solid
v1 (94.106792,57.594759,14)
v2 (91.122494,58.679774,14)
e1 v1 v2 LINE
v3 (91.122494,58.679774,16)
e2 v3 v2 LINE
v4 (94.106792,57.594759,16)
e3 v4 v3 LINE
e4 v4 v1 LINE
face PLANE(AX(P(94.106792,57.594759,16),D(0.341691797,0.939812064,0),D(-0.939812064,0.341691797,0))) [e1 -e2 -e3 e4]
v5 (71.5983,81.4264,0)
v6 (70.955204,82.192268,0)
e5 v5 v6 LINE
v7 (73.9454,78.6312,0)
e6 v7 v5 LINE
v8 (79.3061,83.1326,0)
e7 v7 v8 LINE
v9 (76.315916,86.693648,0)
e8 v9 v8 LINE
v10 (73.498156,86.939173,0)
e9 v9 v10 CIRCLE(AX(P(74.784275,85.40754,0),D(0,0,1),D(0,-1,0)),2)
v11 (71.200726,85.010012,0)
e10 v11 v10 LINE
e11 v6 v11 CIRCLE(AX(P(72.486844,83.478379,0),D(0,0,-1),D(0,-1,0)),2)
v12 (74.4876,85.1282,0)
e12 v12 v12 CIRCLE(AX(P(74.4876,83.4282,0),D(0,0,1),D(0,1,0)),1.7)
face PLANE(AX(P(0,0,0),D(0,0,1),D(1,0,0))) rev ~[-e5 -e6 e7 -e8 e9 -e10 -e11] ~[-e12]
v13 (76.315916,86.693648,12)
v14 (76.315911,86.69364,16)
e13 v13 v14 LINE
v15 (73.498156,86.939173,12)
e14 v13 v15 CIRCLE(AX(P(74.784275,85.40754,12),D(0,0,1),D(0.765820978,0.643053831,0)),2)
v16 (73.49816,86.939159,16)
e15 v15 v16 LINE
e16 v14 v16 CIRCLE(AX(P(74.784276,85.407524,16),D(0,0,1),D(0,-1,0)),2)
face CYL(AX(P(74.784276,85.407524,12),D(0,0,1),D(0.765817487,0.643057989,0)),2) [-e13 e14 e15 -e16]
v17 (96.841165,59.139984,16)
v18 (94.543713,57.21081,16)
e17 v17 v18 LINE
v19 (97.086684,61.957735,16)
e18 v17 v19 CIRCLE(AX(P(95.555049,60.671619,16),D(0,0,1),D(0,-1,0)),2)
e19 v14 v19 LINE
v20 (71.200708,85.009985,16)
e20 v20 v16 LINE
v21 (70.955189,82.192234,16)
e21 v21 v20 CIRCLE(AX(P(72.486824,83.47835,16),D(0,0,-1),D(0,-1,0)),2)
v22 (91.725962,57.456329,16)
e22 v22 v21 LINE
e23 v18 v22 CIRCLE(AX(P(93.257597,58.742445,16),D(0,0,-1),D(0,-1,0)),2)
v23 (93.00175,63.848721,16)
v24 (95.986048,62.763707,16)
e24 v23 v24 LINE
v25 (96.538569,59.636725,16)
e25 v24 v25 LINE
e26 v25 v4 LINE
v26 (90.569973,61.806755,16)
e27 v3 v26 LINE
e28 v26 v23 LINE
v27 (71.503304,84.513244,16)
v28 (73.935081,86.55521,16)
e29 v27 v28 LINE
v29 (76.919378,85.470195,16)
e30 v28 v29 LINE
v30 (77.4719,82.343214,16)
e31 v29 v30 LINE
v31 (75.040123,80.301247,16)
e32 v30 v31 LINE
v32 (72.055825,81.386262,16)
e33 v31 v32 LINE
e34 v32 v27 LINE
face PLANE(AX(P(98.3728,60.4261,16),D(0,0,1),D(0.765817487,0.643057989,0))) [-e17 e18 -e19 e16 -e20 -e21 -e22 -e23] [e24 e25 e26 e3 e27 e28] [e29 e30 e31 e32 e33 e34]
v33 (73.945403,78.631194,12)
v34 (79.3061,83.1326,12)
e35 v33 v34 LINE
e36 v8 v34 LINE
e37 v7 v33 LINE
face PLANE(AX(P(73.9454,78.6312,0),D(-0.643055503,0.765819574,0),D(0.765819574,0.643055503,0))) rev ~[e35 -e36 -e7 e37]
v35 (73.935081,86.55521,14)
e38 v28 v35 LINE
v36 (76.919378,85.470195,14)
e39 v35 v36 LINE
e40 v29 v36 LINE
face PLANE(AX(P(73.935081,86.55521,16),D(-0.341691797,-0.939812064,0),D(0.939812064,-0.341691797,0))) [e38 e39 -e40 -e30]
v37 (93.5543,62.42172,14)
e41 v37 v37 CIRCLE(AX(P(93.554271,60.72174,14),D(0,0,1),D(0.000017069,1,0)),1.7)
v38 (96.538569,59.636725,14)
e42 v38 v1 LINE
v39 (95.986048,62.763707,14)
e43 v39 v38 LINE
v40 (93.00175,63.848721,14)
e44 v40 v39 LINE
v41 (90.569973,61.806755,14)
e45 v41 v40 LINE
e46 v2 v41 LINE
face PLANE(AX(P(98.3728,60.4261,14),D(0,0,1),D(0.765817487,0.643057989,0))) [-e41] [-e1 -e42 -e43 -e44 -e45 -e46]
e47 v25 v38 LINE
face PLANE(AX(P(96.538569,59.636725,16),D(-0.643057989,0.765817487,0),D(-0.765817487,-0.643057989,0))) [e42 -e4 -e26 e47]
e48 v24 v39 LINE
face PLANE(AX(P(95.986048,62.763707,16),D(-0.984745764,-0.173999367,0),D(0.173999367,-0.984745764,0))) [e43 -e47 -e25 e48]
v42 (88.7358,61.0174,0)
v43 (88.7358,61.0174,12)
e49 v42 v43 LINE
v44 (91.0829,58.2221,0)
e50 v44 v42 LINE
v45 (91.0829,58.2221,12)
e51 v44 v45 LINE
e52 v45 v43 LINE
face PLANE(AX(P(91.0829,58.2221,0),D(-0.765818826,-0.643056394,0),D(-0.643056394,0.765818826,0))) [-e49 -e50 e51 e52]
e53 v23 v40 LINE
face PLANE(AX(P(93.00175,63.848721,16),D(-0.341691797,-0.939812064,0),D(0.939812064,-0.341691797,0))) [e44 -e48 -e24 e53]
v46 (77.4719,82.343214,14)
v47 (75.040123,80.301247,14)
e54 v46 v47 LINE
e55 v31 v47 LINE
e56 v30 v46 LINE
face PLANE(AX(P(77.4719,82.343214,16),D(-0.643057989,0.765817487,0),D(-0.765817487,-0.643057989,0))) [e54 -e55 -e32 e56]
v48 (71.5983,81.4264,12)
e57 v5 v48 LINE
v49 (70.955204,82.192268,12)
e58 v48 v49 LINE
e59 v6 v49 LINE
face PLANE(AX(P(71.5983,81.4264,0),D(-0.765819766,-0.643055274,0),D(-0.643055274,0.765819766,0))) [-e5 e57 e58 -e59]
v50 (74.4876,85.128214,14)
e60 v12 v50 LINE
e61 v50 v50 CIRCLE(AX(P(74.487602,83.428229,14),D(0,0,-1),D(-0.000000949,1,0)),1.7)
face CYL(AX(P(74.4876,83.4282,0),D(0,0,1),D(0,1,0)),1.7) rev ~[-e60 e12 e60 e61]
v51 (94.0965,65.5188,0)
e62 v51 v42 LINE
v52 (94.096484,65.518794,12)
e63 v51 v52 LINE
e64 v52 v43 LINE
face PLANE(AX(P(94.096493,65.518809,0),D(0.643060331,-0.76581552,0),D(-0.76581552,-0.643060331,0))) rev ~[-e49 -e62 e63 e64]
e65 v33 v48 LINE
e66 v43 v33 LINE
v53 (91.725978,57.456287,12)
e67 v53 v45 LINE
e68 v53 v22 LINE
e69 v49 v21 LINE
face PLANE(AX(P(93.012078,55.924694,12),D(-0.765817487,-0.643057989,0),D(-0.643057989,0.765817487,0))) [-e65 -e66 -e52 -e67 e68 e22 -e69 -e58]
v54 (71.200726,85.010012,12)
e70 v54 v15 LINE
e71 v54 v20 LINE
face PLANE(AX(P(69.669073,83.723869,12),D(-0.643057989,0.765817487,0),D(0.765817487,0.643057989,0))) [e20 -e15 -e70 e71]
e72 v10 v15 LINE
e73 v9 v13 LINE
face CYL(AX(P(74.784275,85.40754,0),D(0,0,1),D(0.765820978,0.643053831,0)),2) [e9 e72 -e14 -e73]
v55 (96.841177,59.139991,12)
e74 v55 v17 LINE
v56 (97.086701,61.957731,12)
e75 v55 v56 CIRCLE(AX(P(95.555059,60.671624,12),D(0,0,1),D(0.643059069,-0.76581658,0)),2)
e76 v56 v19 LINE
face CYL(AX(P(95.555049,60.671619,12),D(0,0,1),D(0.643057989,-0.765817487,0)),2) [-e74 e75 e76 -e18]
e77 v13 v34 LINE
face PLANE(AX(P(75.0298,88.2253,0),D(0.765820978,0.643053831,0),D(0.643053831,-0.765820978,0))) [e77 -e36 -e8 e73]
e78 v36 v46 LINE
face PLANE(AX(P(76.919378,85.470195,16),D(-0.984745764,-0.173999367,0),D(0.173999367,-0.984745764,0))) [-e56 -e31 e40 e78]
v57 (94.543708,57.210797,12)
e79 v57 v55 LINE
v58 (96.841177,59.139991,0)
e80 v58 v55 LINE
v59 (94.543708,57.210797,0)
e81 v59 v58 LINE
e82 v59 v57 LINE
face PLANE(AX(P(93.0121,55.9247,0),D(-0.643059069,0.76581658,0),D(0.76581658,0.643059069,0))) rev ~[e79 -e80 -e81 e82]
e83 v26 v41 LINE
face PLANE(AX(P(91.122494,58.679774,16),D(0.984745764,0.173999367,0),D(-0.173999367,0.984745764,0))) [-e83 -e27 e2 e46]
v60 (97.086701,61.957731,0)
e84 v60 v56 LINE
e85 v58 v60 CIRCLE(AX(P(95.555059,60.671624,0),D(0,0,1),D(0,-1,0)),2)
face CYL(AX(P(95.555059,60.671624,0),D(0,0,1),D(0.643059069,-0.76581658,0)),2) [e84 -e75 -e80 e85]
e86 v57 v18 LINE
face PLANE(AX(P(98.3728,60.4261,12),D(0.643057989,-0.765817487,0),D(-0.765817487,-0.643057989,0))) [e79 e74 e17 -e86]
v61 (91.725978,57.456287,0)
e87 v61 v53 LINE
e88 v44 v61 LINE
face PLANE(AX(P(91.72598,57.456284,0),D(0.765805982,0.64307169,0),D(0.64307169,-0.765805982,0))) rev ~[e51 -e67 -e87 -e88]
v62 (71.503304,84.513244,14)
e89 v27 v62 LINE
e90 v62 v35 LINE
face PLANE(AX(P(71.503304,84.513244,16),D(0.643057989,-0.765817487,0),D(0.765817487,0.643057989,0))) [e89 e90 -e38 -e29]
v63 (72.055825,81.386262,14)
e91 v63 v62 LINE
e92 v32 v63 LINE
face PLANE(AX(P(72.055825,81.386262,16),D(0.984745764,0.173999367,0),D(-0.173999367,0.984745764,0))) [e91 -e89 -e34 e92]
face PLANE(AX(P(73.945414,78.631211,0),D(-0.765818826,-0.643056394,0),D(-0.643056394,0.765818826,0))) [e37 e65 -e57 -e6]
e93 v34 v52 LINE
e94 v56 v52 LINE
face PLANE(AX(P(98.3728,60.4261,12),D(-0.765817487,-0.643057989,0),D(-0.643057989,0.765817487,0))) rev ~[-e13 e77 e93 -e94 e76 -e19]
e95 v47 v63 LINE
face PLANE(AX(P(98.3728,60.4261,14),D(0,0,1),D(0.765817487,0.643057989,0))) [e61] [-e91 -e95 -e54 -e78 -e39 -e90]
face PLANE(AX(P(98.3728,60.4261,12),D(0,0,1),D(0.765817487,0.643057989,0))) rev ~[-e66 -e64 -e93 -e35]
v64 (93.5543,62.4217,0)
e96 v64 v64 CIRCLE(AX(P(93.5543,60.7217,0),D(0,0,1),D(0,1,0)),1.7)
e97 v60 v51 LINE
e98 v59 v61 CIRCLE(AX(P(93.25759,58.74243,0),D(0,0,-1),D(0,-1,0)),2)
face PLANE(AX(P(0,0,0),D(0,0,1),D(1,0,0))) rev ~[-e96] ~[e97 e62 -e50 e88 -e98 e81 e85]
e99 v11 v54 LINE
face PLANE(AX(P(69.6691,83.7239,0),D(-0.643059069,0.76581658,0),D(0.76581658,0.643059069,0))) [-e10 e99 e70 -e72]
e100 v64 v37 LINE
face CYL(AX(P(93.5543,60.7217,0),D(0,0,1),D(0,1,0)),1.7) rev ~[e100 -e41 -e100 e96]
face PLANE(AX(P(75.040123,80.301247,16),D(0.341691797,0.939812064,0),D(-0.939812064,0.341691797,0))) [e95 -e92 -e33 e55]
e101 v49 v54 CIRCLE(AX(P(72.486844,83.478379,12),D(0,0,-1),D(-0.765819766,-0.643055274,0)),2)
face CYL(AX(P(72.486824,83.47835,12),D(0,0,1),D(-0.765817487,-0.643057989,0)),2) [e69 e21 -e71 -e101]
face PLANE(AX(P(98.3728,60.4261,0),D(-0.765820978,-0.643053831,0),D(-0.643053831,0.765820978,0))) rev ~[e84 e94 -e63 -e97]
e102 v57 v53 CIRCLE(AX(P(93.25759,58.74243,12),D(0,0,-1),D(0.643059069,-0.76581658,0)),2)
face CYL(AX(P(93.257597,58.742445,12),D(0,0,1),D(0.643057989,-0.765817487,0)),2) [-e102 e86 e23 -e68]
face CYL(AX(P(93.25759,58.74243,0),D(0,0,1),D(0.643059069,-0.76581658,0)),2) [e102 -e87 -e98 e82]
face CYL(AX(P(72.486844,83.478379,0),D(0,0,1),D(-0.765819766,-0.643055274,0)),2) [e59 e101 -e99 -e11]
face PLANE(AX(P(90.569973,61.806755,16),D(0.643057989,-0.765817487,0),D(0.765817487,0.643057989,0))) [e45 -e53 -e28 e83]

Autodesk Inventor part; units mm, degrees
ref_plane "YZ Plane" through (0, 0, 0) normal (1, 0, 0) x (0, 1, 0)
sketch "Sketch1" plane through (0, 0, 0) normal (0, 0, 1) x (1, 0, 0)
  line L0 (91.0829, 58.2221) -> (71.5983, 81.4264) projected
  line L1 (73.9454, 78.6312) -> (81.7568, 85.1904) projected
  line L2 (96.5471, 67.5766) -> (88.7358, 61.0174) projected
  line L3 (71.5983, 81.4264) -> (69.6691, 83.7239)
  line L4 (69.6691, 83.7239) -> (75.0298, 88.2253)
  line L5 (75.0298, 88.2253) -> (79.3061, 83.1326)
  line L6 (91.0829, 58.2221) -> (93.0121, 55.9247)
  line L7 (93.0121, 55.9247) -> (98.3728, 60.4261)
  line L8 (98.3728, 60.4261) -> (94.0965, 65.5188)
  line L9 (81.3406, 69.8243) -> (102.4069, 87.5137) construction
  line L10 (91.726, 57.4563) -> (90.0029, 56.0094) projected
  line L11 (95.6925, 58.1754) -> (91.4161, 63.2681) construction
  line L12 (72.3494, 85.9746) -> (76.6258, 80.8819) construction
  point P0 (0, 0)
  point P1 (93.5543, 60.7217)
  point P2 (74.4876, 83.4282)
  dimension "d0" = 2
  dimension "d1" = 7
ref_plane "Work Plane1" through (72.2806, 68.9104, 57.5461) normal (0, 0, 1) x (0.7658175, 0.643058, 0)
ref_plane "Work Plane2" through (75.6298, 74.8001, 12) normal (0, 0, 1) x (0.7658175, 0.643058, 0)
extrude "Extrusion1" add sketch "Sketch1" along normal up to surface (12 mm away)
sketch "Sketch2" plane through (98.3728, 60.4261, 12) normal (0, 0, 1) x (0.7658175, 0.643058, 0)
  line L0 (0, 0) -> (0, 6.65) projected
  line L1 (-7, 29.65) -> (-7, 36.3) projected
  line L2 (0, 0) -> (-7, 0)
  line L3 (-7, 0) -> (-7, 36.3)
  line L4 (-7, 36.3) -> (0, 36.3)
  line L5 (0, 36.3) -> (0, 0)
  point P0 (-114.1931, 16.9841)
  point P1 (0, 6.65)
  point P2 (-7, 29.65)
extrude "Extrusion2" add sketch "Sketch2" along normal blind 4
hole "Hole1" at (74.4876, 83.4282, 0) at (93.5543, 60.7217, 0) direction (0, 0, 1) diameter 3.4 end through all clearance for "Countersunk Head GOST 12876-67" size "M3" standard "GOST"
fillet "Fillet1" radius 2 8 edges at (93.0121, 55.9247, 14) (93.0121, 55.9247, 6) (98.3728, 60.4261, 14) (98.3728, 60.4261, 6) (75.0298, 88.2253, 14) (75.0298, 88.2253, 6) (69.6691, 83.7239, 14) (69.6691, 83.7239, 6)
sketch "Sketch3" plane through (98.3728, 60.4261, 16) normal (0, 0, 1) x (0.7658175, 0.643058, 0)
  circle A0 centre (-3.5, 3.325) radius 1.7 projected
  circle A1 centre (-3.5, 32.975) radius 1.7 projected
  line L0 (-1.9123, 6.075) -> (-0.3246, 3.325)
  line L1 (-0.3246, 3.325) -> (-1.9123, 0.575)
  line L2 (-1.9123, 0.575) -> (-5.0877, 0.575)
  line L3 (-5.0877, 0.575) -> (-6.6754, 3.325)
  line L4 (-6.6754, 3.325) -> (-5.0877, 6.075)
  line L5 (-5.0877, 6.075) -> (-1.9123, 6.075)
  line L6 (-1.9123, 30.225) -> (-5.0877, 30.225)
  line L7 (-5.0877, 30.225) -> (-6.6754, 32.975)
  line L8 (-6.6754, 32.975) -> (-5.0877, 35.725)
  line L9 (-5.0877, 35.725) -> (-1.9123, 35.725)
  line L10 (-1.9123, 35.725) -> (-0.3246, 32.975)
  line L11 (-0.3246, 32.975) -> (-1.9123, 30.225)
  line L12 (-5, 0) -> (-2, 0) projected
  point P0 (-114.1931, 16.9841)
  point P1 (-3.5, 3.325)
  point P2 (-3.5, 32.975)
  dimension "d14" = 5.5
  dimension "d15" = 5.5
extrude "Extrusion3" cut sketch "Sketch3" against normal blind 2
properties part number "servo_holder"
